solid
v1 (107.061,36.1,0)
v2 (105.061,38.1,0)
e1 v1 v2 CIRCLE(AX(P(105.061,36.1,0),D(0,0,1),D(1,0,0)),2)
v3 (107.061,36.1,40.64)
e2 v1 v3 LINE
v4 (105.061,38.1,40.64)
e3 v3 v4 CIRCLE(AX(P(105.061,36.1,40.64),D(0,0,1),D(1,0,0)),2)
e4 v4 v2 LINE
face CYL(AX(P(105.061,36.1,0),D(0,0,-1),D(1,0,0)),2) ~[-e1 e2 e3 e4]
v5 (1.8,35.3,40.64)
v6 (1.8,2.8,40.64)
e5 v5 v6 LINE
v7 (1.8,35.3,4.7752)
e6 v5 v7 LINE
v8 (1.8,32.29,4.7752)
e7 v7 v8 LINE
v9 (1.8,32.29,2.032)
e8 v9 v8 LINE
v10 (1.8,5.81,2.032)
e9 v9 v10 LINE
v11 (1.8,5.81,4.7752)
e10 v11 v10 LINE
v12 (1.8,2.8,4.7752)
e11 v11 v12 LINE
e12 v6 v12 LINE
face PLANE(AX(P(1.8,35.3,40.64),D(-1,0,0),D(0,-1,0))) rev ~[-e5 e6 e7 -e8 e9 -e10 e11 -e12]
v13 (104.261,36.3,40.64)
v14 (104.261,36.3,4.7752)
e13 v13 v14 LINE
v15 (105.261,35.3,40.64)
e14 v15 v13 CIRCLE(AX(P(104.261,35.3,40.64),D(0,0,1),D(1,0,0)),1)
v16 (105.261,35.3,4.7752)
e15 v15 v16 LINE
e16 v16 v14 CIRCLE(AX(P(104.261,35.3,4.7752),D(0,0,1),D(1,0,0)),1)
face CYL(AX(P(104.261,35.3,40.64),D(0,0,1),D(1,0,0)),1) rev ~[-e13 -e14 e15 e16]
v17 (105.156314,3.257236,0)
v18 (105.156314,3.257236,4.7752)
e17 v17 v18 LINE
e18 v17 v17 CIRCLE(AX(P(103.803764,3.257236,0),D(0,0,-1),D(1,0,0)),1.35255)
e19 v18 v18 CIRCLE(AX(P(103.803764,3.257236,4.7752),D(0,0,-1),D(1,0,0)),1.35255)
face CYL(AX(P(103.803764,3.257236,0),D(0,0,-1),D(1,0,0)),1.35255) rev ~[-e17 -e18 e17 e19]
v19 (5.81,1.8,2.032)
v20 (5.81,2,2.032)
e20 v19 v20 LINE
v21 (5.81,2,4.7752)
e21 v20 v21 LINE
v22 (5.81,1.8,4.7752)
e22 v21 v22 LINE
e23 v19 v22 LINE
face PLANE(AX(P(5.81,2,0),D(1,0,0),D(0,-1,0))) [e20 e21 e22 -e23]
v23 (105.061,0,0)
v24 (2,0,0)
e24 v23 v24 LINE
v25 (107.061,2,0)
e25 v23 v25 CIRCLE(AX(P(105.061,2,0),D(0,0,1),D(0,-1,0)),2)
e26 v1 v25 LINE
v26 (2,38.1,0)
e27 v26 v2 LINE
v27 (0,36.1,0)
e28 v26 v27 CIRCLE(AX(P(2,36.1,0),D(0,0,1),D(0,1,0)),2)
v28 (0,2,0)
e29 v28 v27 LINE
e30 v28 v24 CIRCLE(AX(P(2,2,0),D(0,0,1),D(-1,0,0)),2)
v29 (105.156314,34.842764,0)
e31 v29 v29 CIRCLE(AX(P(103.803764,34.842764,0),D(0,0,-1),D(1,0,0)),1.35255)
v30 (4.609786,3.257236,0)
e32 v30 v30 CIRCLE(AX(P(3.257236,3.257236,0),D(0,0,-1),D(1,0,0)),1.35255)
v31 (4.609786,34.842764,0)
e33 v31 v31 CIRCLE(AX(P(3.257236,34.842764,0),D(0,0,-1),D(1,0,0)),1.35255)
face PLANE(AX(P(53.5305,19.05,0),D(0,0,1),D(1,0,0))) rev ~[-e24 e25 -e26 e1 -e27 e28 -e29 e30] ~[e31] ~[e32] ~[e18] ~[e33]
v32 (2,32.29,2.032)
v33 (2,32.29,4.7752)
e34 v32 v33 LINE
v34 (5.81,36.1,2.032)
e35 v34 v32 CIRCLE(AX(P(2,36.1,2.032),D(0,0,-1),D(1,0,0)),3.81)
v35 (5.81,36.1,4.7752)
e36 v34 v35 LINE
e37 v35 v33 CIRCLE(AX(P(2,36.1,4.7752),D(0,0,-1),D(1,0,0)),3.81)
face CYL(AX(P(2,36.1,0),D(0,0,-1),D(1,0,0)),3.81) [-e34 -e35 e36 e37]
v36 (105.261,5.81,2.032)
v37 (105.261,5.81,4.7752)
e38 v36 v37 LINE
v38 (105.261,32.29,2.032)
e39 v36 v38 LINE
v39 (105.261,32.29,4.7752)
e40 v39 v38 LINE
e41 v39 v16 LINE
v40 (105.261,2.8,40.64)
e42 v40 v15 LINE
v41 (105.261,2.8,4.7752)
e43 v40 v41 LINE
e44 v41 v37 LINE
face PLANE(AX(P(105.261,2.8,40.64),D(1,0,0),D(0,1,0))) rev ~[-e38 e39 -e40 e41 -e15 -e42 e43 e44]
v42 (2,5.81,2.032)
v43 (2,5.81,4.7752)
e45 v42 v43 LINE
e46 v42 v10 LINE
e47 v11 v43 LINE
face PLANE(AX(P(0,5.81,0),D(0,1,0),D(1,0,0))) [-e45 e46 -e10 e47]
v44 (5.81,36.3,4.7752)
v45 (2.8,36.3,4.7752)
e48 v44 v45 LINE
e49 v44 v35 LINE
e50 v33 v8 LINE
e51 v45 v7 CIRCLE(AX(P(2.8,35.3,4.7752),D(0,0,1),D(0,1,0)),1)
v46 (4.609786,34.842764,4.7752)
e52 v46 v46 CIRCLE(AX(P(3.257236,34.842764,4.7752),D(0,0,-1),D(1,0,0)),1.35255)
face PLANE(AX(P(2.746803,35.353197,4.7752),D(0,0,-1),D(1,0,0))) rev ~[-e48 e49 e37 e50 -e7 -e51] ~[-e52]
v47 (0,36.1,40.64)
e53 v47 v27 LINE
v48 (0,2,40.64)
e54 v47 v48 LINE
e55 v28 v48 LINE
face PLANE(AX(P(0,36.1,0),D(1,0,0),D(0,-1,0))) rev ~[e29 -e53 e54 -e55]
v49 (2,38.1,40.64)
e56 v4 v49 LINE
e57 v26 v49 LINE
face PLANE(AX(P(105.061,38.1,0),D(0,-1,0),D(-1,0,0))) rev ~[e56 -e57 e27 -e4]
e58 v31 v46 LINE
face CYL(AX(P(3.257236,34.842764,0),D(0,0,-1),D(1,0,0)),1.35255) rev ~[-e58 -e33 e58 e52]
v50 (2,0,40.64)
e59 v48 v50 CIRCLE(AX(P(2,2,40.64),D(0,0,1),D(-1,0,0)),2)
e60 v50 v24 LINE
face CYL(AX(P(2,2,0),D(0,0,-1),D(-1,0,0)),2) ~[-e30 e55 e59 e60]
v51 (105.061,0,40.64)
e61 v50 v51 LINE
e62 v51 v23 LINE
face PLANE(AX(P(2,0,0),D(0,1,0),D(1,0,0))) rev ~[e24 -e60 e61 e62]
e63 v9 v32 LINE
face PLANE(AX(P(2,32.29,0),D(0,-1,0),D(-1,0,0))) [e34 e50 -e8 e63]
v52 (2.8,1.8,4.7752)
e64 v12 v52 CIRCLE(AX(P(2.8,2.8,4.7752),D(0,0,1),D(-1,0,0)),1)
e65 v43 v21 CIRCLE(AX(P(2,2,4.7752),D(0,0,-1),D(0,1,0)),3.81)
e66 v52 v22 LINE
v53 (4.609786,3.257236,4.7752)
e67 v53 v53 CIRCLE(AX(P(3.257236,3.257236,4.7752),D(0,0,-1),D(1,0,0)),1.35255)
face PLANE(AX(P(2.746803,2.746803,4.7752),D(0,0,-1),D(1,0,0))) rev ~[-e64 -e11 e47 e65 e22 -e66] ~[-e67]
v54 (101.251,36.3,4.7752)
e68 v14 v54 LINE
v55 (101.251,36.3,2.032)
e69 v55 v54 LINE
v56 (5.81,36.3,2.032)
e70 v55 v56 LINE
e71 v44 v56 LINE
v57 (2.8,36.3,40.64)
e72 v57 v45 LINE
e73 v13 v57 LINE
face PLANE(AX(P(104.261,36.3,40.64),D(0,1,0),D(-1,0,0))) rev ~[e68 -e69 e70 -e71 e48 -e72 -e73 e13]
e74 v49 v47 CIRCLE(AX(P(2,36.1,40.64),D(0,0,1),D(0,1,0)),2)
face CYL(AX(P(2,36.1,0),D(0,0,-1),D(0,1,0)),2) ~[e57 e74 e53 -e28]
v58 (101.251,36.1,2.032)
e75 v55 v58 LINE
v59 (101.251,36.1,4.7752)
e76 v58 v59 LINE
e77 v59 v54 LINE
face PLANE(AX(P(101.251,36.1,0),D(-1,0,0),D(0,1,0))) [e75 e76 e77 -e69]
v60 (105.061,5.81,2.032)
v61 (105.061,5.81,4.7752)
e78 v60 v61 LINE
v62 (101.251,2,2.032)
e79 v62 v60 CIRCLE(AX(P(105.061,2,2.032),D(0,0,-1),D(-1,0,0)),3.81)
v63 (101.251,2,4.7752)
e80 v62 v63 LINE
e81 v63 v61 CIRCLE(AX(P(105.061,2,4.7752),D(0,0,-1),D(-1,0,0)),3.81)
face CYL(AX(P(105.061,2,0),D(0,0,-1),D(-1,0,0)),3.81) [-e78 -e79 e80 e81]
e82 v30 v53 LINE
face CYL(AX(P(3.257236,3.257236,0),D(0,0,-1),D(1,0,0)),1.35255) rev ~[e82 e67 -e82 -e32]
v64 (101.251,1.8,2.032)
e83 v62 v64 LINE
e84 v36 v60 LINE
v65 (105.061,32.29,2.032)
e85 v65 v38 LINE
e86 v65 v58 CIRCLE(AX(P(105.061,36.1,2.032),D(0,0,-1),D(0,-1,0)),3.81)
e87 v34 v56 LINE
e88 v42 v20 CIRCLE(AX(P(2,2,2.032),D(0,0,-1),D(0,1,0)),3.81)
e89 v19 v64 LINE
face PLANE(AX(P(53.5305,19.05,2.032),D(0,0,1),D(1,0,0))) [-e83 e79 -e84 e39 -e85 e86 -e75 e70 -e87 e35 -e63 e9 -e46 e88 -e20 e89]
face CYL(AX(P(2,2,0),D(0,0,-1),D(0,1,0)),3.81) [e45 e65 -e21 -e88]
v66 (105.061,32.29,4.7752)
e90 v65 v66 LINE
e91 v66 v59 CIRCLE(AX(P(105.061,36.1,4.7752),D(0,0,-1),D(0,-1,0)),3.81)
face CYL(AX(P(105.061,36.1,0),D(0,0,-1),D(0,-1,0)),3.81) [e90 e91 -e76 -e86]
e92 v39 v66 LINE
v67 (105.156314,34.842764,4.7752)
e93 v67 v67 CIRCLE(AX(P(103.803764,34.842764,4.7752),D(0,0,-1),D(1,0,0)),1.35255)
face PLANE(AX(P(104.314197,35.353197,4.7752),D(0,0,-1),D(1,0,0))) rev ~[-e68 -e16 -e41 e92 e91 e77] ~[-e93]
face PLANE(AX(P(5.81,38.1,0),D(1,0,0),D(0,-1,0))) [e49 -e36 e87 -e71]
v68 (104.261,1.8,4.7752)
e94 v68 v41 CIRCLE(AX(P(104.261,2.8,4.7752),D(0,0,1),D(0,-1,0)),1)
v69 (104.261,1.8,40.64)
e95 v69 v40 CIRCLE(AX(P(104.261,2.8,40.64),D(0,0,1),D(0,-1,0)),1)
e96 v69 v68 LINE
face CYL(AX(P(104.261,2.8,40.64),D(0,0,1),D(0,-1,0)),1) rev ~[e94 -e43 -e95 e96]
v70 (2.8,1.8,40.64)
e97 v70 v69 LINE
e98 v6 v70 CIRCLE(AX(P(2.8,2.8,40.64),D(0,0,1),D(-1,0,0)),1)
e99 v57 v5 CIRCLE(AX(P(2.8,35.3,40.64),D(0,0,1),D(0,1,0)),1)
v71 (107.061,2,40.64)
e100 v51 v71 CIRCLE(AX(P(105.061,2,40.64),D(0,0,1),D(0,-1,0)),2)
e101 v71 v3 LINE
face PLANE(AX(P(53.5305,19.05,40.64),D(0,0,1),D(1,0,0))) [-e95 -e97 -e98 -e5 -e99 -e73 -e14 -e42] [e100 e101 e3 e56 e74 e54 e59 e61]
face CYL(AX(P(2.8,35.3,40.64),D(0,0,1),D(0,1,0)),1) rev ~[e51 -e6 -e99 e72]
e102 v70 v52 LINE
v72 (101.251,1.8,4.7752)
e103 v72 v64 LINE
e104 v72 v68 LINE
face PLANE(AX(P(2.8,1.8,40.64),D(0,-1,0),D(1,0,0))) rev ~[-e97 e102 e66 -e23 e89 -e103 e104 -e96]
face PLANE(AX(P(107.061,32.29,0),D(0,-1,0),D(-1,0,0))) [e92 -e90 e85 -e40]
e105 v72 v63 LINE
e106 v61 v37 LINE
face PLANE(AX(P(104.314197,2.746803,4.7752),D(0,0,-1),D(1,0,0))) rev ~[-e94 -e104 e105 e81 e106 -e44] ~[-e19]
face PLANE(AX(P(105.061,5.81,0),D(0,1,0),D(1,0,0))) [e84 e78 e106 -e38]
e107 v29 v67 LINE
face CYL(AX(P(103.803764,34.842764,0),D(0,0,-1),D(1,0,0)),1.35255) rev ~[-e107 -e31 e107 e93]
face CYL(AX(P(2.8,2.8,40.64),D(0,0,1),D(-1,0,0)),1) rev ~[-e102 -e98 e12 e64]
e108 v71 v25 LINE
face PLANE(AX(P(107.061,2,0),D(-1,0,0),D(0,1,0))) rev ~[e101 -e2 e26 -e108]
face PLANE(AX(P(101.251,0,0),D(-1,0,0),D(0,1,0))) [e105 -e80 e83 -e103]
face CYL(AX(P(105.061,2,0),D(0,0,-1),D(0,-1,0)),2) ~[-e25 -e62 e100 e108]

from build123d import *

# Parameters (mm, degrees)
F1_DEPTH = 40.64
F3_DEPTH = 38.608
F5_DEPTH = 4.7752
F6_R     = 1.35255
F7_DEPTH = 4.7752


# Not quite as in the source:
# - a feature names something its author has since deleted; it is built from what else it names


with BuildPart() as f1:
    # F0 (on Top) → F1 (new body)
    with BuildSketch(Plane.XY):
        with BuildLine():
            ThreePointArc((0, 2), (0.5857864376, 0.5857864376), (2, 0))
            Line((2, 0), (105.061, 0))
            ThreePointArc((105.061, 0), (106.4752135624, 0.5857864376), (107.061, 2))
            Line((107.061, 2), (107.061, 36.1))
            ThreePointArc((107.061, 36.1), (106.4752135624, 37.5142135624), (105.061, 38.1))
            Line((105.061, 38.1), (2, 38.1))
            ThreePointArc((2, 38.1), (0.5857864376, 37.5142135624), (0, 36.1))
            Line((0, 36.1), (0, 2))
        make_face()
    extrude(amount=F1_DEPTH)

    # F2 (on face) → F3 (cut)
    with BuildSketch(Plane.XY.offset(40.64)):
        with BuildLine():
            Line((104.261, 36.3), (2.8, 36.3))
            ThreePointArc((2.8, 36.3), (2.0928932188, 36.0071067812), (1.8, 35.3))
            Line((1.8, 35.3), (1.8, 2.8))
            ThreePointArc((1.8, 2.8), (2.0928932188, 2.0928932188), (2.8, 1.8))
            Line((2.8, 1.8), (104.261, 1.8))
            ThreePointArc((104.261, 1.8), (104.9681067812, 2.0928932188), (105.261, 2.8))
            Line((105.261, 2.8), (105.261, 35.3))
            ThreePointArc((105.261, 35.3), (104.9681067812, 36.0071067812), (104.261, 36.3))
        make_face()
    extrude(amount=-F3_DEPTH, mode=Mode.SUBTRACT)

    # F4 (on face) → F5 (join)
    with BuildSketch(Plane(origin=(0, 0, 0), x_dir=(1, 0, 0), z_dir=(0, 0, -1))):
        with BuildLine():
            ThreePointArc((107.061, -2), (106.4752135624, -0.5857864376), (105.061, 0))
            Line((105.061, 0), (101.251, 0))
            Line((101.251, 0), (101.251, -2))
            ThreePointArc((101.251, -2), (102.3669231637, -4.6940768363), (105.061, -5.81))
            Line((105.061, -5.81), (107.061, -5.81))
            Line((107.061, -5.81), (107.061, -2))
        make_face()
        with BuildLine():
            Line((101.251, -36.1), (101.251, -38.1))
            Line((101.251, -38.1), (105.061, -38.1))
            ThreePointArc((105.061, -38.1), (106.4752135624, -37.5142135624), (107.061, -36.1))
            Line((107.061, -36.1), (107.061, -32.29))
            Line((107.061, -32.29), (105.061, -32.29))
            ThreePointArc((105.061, -32.29), (102.3669231637, -33.4059231637), (101.251, -36.1))
        make_face()
        with BuildLine():
            ThreePointArc((5.81, -36.1), (4.6940768363, -33.4059231637), (2, -32.29))
            Line((2, -32.29), (0, -32.29))
            Line((0, -32.29), (0, -36.1))
            ThreePointArc((0, -36.1), (0.5857864376, -37.5142135624), (2, -38.1))
            Line((2, -38.1), (5.81, -38.1))
            Line((5.81, -38.1), (5.81, -36.1))
        make_face()
        with BuildLine():
            Line((5.81, 0), (2, 0))
            ThreePointArc((2, 0), (0.5857864376, -0.5857864376), (0, -2))
            Line((0, -2), (0, -5.81))
            Line((0, -5.81), (2, -5.81))
            ThreePointArc((2, -5.81), (4.6940768363, -4.6940768363), (5.81, -2))
            Line((5.81, -2), (5.81, 0))
        make_face()
    extrude(amount=-F5_DEPTH)

    # F6 (on face) → F7 (cut, through all)
    with BuildSketch(Plane(origin=(0, 0, 0), x_dir=(1, 0, 0), z_dir=(0, 0, -1))):
        with Locations((103.8037641431, -3.2572358569)):
            Circle(F6_R)
        with Locations((3.2572358569, -3.2572358569)):
            Circle(F6_R)
        with Locations((3.2572358569, -34.8427641431)):
            Circle(F6_R)
        with Locations((103.8037641431, -34.8427641431)):
            Circle(F6_R)
    extrude(amount=-F7_DEPTH, mode=Mode.SUBTRACT)


solid = f1.part
